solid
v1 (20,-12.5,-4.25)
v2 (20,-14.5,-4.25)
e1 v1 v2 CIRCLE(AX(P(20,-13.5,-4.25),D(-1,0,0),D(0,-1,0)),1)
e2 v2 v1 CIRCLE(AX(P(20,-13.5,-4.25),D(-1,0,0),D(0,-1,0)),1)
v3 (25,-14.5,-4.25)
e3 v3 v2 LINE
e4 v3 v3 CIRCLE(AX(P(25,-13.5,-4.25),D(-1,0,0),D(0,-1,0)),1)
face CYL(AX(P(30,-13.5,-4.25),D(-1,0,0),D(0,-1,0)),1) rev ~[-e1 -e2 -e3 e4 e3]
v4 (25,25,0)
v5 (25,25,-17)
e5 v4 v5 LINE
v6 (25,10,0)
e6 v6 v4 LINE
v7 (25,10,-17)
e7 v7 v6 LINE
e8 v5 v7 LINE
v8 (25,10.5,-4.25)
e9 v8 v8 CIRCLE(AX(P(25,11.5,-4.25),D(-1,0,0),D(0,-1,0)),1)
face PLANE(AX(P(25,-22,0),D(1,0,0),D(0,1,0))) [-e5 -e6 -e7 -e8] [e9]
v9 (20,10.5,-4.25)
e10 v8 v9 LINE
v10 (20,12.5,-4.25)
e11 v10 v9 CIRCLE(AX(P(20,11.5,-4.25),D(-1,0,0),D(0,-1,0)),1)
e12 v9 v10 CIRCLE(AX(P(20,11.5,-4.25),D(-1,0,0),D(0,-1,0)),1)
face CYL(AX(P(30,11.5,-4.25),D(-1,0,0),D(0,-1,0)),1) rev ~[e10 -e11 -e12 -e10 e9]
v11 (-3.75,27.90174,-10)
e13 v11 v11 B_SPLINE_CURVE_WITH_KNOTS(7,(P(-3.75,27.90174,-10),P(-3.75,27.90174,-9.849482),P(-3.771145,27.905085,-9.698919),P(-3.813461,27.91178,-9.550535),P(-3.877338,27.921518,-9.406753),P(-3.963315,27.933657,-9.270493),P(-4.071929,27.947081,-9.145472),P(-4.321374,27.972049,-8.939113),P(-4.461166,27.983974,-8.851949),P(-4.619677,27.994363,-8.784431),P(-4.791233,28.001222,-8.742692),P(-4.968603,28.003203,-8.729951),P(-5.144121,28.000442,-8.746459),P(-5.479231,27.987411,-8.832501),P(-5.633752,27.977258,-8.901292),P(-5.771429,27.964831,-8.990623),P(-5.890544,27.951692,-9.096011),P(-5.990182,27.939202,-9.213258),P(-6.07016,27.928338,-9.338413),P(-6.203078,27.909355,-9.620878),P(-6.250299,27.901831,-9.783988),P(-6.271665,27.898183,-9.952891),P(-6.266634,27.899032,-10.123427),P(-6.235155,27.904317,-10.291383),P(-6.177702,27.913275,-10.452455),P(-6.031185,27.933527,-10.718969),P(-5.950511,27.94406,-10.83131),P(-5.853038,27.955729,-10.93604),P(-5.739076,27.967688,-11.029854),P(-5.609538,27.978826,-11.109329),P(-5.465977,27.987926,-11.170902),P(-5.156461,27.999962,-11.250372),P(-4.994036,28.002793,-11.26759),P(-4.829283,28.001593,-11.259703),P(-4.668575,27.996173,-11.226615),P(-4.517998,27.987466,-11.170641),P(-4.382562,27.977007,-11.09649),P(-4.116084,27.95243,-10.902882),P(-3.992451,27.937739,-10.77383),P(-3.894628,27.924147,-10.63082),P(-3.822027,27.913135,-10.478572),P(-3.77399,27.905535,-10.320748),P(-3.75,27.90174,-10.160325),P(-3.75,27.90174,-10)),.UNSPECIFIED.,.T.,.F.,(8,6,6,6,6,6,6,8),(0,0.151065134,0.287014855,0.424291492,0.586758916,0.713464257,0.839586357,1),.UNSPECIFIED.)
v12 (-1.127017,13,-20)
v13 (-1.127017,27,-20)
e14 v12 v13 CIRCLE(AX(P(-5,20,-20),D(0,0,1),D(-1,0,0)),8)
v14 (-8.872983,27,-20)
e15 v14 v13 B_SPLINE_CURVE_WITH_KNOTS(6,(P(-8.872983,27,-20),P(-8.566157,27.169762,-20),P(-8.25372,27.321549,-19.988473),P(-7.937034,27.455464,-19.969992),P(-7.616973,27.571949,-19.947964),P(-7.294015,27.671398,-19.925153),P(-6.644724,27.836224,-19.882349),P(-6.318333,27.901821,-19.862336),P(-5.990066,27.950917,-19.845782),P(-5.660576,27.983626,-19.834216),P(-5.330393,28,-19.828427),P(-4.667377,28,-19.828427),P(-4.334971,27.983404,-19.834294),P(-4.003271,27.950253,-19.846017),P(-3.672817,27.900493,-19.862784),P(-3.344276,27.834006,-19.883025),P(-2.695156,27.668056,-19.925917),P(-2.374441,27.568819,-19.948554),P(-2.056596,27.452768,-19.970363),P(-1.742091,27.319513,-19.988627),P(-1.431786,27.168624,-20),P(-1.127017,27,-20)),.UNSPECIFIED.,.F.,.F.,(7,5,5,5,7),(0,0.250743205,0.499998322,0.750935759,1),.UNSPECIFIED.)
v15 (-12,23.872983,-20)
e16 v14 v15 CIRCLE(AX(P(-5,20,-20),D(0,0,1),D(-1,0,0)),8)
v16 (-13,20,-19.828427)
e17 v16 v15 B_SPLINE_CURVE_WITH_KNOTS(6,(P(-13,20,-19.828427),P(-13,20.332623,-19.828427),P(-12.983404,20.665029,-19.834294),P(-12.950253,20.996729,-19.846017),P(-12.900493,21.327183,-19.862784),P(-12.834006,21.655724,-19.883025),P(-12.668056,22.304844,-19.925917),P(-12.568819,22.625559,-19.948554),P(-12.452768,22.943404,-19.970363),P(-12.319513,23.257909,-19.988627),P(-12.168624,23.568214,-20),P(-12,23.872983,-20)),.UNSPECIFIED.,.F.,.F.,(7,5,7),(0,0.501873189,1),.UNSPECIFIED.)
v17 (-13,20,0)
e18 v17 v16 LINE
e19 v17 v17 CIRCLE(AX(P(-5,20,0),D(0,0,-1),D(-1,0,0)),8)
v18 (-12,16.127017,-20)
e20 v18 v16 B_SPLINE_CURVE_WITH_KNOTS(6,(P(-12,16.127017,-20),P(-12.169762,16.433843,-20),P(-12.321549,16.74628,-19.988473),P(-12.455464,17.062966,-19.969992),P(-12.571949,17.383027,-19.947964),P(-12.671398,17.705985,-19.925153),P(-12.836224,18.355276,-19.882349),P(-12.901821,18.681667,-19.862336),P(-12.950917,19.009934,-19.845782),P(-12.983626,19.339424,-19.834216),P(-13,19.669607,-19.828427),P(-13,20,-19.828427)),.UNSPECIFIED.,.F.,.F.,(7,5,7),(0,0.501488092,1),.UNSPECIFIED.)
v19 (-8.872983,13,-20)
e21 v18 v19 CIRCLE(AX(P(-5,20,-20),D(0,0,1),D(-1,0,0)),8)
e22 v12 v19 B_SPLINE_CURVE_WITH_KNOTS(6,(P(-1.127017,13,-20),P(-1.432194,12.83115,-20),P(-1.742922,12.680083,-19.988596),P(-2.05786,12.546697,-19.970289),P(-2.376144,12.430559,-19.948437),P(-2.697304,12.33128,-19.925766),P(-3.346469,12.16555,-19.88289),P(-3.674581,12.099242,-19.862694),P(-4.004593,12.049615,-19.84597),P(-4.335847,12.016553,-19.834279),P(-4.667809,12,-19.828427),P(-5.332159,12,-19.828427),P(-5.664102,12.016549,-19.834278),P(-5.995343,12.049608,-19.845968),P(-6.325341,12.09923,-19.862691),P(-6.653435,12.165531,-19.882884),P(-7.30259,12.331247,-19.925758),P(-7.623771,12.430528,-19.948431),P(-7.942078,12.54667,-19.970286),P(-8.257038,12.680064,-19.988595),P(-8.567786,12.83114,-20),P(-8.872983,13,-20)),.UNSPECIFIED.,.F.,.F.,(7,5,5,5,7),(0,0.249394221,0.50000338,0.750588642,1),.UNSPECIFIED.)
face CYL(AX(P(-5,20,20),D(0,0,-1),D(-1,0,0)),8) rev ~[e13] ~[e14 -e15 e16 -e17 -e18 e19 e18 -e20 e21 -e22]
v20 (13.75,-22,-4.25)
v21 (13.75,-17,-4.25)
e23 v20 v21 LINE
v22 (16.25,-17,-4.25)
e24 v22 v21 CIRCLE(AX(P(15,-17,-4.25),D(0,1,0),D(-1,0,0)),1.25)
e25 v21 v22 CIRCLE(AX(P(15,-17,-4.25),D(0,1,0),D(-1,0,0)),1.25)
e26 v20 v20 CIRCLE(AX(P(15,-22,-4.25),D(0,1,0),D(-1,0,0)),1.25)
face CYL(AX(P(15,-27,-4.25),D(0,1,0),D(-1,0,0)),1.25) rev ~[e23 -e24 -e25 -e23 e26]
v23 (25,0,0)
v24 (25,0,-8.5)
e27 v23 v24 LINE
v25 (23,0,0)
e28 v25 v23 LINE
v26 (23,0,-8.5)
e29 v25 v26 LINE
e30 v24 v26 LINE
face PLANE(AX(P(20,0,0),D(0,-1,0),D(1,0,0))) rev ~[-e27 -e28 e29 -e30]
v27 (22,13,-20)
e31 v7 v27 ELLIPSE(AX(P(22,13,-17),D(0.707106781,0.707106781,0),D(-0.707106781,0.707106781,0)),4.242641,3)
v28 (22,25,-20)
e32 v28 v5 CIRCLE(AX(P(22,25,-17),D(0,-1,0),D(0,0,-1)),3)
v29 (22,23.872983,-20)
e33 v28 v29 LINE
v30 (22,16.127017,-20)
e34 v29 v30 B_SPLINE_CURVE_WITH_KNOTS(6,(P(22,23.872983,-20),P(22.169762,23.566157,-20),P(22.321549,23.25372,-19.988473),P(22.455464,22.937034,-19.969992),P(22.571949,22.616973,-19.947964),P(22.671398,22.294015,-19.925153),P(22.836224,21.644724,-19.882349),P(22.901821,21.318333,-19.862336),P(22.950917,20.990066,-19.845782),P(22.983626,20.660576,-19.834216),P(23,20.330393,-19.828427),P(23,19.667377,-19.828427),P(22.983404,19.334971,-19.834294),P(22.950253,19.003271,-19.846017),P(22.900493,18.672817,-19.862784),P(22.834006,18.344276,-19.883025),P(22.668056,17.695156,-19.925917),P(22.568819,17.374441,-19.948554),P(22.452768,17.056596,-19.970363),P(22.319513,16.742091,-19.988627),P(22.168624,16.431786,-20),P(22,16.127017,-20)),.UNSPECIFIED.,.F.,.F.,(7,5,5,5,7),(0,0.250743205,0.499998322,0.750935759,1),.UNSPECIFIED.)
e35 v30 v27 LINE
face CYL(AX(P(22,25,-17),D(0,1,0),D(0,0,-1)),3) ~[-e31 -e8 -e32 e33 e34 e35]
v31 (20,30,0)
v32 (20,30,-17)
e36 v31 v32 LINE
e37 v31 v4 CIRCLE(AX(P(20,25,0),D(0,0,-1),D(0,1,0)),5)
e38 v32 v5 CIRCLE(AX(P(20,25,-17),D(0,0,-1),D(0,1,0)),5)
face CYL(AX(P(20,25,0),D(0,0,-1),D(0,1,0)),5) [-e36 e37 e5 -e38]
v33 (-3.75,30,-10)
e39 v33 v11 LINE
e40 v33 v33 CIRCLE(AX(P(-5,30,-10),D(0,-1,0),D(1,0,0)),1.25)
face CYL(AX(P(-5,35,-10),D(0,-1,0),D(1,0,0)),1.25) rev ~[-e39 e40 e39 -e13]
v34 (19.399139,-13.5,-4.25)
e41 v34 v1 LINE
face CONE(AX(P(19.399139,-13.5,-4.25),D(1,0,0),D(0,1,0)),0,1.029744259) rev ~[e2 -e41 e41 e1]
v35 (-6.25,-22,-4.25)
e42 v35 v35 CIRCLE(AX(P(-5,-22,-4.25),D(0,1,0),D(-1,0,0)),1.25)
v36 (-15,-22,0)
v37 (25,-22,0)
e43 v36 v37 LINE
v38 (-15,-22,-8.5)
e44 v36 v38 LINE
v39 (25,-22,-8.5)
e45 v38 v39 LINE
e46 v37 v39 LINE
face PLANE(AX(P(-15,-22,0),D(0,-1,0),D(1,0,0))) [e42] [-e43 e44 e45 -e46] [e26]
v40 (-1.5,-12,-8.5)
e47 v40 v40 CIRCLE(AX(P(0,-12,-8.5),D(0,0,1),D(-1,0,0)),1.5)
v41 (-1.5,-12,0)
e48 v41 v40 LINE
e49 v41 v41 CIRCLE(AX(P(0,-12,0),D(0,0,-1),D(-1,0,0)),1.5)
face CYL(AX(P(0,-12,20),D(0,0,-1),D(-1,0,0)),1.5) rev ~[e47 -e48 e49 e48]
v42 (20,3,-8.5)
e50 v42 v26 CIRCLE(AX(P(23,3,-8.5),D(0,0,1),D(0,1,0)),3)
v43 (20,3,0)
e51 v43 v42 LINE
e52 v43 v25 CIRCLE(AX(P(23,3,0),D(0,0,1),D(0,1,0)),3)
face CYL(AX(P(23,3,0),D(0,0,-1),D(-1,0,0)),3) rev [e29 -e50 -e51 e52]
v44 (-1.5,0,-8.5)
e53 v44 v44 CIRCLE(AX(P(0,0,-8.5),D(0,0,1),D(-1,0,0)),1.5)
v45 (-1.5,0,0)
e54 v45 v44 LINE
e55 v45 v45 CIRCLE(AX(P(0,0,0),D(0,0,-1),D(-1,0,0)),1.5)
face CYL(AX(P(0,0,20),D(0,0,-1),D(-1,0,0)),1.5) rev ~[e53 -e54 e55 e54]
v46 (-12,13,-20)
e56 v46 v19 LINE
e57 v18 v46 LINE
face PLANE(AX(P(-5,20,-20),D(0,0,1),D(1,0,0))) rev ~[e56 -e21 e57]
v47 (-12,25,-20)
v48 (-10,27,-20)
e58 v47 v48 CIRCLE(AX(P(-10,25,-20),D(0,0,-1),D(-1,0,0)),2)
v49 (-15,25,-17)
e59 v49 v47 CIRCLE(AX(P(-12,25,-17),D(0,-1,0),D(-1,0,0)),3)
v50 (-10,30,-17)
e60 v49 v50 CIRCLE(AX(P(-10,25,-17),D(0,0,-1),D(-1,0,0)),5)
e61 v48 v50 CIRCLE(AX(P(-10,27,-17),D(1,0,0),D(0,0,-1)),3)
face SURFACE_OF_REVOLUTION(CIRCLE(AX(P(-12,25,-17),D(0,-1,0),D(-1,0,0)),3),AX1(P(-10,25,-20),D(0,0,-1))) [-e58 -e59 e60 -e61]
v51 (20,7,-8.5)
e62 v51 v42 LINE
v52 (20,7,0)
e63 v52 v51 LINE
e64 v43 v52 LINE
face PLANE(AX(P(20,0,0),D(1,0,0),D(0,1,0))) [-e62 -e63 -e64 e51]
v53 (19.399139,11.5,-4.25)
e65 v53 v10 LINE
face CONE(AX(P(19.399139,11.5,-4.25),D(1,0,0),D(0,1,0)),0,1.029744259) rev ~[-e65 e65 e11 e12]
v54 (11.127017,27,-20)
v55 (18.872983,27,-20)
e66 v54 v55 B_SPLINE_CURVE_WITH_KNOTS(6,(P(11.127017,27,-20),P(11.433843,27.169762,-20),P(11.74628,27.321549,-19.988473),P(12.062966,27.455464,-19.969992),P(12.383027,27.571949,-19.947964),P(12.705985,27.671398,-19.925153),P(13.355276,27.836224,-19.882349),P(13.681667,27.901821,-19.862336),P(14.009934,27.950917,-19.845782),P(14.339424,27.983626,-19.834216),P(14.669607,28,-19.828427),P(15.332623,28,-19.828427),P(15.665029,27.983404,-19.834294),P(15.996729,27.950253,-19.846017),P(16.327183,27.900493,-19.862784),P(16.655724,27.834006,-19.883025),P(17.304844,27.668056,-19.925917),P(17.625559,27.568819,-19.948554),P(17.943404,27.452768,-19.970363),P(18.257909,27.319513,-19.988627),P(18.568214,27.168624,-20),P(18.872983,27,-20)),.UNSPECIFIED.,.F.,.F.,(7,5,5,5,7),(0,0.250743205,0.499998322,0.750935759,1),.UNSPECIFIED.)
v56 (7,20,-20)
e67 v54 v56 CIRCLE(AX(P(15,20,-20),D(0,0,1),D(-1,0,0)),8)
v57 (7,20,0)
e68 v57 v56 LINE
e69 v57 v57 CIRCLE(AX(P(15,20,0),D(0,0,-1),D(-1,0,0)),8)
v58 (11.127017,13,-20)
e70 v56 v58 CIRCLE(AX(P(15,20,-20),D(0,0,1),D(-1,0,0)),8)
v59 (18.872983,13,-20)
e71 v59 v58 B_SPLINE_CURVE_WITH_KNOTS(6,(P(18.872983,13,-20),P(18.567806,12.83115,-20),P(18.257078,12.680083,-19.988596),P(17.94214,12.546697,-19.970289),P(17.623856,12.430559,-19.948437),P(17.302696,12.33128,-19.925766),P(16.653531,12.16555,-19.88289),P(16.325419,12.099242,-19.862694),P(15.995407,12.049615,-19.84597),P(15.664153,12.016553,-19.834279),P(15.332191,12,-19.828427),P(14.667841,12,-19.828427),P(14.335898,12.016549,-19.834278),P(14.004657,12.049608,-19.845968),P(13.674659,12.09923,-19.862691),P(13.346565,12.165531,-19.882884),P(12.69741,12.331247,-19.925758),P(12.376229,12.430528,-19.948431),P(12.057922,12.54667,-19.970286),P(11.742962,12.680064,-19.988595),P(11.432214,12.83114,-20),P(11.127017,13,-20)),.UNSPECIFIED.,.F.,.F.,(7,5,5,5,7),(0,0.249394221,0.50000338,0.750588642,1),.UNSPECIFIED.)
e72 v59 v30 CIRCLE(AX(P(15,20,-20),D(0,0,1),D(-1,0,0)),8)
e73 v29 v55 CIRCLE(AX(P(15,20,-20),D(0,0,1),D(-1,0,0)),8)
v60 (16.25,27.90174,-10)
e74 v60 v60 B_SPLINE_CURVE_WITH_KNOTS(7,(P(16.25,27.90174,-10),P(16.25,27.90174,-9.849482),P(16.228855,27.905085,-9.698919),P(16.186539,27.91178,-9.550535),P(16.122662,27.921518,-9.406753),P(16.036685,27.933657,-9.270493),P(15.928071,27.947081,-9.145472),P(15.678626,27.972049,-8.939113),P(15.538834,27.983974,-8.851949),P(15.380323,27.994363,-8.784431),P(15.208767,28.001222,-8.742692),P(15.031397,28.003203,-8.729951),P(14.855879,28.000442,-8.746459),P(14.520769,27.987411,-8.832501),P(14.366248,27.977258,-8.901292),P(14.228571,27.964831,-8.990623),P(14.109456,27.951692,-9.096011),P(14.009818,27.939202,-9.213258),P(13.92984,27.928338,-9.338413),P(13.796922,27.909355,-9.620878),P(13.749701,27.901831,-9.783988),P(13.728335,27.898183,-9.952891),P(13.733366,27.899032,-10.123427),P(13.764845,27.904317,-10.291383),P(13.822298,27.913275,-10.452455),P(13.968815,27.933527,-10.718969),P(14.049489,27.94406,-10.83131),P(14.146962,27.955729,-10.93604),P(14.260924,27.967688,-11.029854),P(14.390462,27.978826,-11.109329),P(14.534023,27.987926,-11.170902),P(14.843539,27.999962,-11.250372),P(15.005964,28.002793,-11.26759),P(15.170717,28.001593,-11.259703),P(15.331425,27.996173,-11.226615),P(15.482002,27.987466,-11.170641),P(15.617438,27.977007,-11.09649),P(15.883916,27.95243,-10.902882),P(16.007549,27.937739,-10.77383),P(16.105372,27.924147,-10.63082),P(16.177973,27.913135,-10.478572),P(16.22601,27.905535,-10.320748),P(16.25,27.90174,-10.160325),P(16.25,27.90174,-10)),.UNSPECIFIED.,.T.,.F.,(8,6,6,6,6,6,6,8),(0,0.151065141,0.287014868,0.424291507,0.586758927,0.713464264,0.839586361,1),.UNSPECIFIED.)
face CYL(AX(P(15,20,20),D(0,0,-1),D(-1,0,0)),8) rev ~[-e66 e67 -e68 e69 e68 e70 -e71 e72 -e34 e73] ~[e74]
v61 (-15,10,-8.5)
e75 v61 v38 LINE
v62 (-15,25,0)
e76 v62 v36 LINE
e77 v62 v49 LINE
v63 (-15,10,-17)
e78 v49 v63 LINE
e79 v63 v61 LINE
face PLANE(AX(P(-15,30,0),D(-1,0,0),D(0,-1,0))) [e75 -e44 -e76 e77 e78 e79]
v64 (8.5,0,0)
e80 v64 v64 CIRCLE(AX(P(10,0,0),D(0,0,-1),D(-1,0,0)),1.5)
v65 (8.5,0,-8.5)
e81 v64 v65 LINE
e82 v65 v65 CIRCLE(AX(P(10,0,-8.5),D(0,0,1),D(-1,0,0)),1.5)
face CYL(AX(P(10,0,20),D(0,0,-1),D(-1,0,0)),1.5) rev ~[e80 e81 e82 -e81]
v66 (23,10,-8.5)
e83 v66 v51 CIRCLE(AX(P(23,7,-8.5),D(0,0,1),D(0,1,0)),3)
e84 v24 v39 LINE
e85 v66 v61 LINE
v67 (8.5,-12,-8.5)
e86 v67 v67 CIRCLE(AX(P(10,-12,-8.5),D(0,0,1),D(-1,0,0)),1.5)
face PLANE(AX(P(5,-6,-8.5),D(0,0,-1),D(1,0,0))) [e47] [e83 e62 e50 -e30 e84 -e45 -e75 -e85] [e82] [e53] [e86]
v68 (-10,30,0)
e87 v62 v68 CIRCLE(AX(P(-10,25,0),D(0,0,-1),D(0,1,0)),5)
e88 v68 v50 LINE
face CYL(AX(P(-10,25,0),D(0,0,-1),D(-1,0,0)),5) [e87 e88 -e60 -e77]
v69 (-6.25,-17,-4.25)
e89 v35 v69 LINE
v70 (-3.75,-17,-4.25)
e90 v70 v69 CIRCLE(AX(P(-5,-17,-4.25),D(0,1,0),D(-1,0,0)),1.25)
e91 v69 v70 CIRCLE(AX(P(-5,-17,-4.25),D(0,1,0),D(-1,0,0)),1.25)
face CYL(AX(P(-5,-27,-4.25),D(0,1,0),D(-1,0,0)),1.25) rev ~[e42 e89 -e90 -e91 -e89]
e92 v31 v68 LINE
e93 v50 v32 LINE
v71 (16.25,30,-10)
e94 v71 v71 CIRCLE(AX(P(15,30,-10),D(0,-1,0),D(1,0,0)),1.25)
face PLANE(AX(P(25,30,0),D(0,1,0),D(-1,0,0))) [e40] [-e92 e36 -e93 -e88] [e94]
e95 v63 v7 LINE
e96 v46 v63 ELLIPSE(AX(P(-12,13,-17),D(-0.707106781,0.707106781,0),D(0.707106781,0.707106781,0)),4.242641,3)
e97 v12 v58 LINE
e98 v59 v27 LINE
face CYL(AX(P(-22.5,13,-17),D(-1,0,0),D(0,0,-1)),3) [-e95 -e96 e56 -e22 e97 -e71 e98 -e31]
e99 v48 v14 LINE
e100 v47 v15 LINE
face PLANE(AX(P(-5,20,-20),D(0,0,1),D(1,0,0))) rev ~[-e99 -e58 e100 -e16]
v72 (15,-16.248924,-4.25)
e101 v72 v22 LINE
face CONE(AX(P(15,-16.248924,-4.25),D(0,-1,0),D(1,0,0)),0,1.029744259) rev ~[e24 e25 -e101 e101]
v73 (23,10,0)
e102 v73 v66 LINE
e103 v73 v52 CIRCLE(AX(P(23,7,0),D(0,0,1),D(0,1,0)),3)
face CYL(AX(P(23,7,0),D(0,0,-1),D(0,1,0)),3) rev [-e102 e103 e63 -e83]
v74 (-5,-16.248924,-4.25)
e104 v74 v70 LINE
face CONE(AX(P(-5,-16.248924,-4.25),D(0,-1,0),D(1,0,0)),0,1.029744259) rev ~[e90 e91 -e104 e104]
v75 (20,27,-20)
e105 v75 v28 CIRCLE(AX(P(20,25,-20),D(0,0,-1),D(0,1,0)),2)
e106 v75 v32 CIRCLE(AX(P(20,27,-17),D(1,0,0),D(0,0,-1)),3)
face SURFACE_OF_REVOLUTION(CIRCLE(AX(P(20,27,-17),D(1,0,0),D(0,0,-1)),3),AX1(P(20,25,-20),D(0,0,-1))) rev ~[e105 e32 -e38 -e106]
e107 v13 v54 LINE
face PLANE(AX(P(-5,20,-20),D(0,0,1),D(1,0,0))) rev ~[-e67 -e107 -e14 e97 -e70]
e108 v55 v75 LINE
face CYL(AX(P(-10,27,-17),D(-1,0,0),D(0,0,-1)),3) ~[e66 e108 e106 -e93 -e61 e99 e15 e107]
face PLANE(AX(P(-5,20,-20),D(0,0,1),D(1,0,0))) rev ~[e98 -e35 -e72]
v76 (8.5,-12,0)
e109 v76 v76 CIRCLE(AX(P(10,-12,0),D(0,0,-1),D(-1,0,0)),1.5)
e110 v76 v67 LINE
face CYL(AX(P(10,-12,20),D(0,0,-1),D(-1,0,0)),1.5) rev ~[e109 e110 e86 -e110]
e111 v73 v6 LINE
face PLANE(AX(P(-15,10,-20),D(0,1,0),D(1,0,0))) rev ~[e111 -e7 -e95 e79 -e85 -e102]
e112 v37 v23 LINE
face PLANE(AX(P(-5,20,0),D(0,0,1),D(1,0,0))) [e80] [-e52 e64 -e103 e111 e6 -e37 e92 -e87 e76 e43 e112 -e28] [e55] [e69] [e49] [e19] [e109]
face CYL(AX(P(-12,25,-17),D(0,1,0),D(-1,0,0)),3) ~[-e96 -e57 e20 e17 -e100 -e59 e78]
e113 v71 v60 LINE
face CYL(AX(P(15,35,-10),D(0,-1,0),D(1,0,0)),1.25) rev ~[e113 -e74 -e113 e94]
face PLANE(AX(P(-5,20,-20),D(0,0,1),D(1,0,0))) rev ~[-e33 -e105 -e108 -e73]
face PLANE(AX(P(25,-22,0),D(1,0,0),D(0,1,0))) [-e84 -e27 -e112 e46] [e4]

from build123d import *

# Parameters (mm, degrees)
F0_W          = 20
F0_H          = 20
F1_DEPTH      = 20
F2_D          = 3
F2_DEPTH      = 20
F2_TIP        = 0.9012909285
F3_D          = 16
F3_DEPTH      = 20
F3_TIP        = 4.8068849522
F4_W          = 40
F4_H          = 32
F4_R          = 1.5
F5_DEPTH      = 11.5
F7_D          = 2.5
F7_DEPTH      = 5
F7_TIP        = 0.7510757738
F8_R          = 5
F10_D         = 2.5
F10_DEPTH     = 5
F10_TIP       = 0.7510757738
F11_T1_DEPTH  = 22.5
F11_T3_DEPTH  = 55
F11_T5_DEPTH  = 30
F11_T8_ANGLE  = 90
F11_T10_ANGLE = 90
F13_W         = 5
F13_H         = 10
F14_DEPTH     = 25
F15_R         = 3
F16_D         = 2
F16_DEPTH     = 5
F16_TIP       = 0.600860619


# Not quite as in the source:
# - a fillet or chamfer that OpenCascade refuses, or shapes differently, is made with other operations: its cross-section is extruded or revolved along the edge and cut away or added


with BuildPart() as f1:
    # F0 (on Top) → F1 (new body)
    with BuildSketch(Plane.XY):
        with Locations((-5, 20)):
            Rectangle(F0_W, F0_H)
        with Locations((15, 20)):
            Rectangle(F0_W, F0_H)
        Polygon((5, 10), (-15, 10), (-15, -22), (25, -22), (25, 10), align=None)
    extrude(amount=-F1_DEPTH)

    # F2
    with Locations(Plane.XY):
        with Locations((10, 0), (0, 0), (0, -12), (10, -12)):
            Hole(F2_D / 2, depth=F2_DEPTH)
            with Locations((0, 0, -(F2_DEPTH + F2_TIP / 2))):  # 118° drill point
                Cone(0, F2_D / 2, F2_TIP, mode=Mode.SUBTRACT)

    # F3
    with Locations(Plane.XY):
        with Locations((15, 20), (-5, 20)):
            Hole(F3_D / 2, depth=F3_DEPTH)
            with Locations((0, 0, -(F3_DEPTH + F3_TIP / 2))):  # 118° drill point
                Cone(0, F3_D / 2, F3_TIP, mode=Mode.SUBTRACT)

    # F4 (on face) → F5 (cut)
    with BuildSketch(Plane(origin=(0, 0, -20), x_dir=(1, 0, 0), z_dir=(0, 0, -1))):
        with Locations((5, 6)):
            Rectangle(F4_W, F4_H)
        Circle(F4_R, mode=Mode.SUBTRACT)
        with Locations((0, 12)):
            Circle(F4_R, mode=Mode.SUBTRACT)
        with Locations((10, 0)):
            Circle(F4_R, mode=Mode.SUBTRACT)
        with Locations((10, 12)):
            Circle(F4_R, mode=Mode.SUBTRACT)
    extrude(amount=-F5_DEPTH, mode=Mode.SUBTRACT)

    # F7
    with Locations(Plane.XZ.offset(22)):
        with Locations((-5, -4.25), (15, -4.25)):
            Hole(F7_D / 2, depth=F7_DEPTH)
            with Locations((0, 0, -(F7_DEPTH + F7_TIP / 2))):  # 118° drill point
                Cone(0, F7_D / 2, F7_TIP, mode=Mode.SUBTRACT)

    # F8
    f8_edges = [f1.edges().sort_by_distance(p)[0] for p in [
        (-15, 30, -10),
        (25, 30, -10),
    ]]
    fillet(f8_edges, radius=F8_R)

    # F10
    with Locations(Plane(origin=(0, 30, 0), x_dir=(-1, 0, 0), z_dir=(0, 1, 0))):
        with Locations((5, -10), (-15, -10)):
            Hole(F10_D / 2, depth=F10_DEPTH)
            with Locations((0, 0, -(F10_DEPTH + F10_TIP / 2))):  # 118° drill point
                Cone(0, F10_D / 2, F10_TIP, mode=Mode.SUBTRACT)

    # F11: fillet of radius 3 on 2 edges, made by hand

    # F11_s2 → F11_t1 (cut)
    with BuildSketch(Plane.XZ.offset(-25)):
        with BuildLine():
            ThreePointArc((-15, -17), (-14.1213203436, -19.1213203436), (-12, -20))
            Line((-12, -20), (-15, -20))
            Line((-15, -20), (-15, -17))
        make_face()
        with BuildLine():
            ThreePointArc((22, -20), (24.1213203436, -19.1213203436), (25, -17))
            Line((25, -17), (25, -20))
            Line((25, -20), (22, -20))
        make_face()
    extrude(amount=F11_T1_DEPTH, mode=Mode.SUBTRACT)

    # F11_s4 → F11_t3 (cut)
    with BuildSketch(Plane.YZ.offset(-22.5)):
        with BuildLine():
            ThreePointArc((13, -20), (10.8786796564, -19.1213203436), (10, -17))
            Line((10, -17), (10, -20))
            Line((10, -20), (13, -20))
        make_face()
    extrude(amount=F11_T3_DEPTH, mode=Mode.SUBTRACT)

    # F11_s6 → F11_t5 (cut)
    with BuildSketch(Plane.YZ.offset(-10)):
        with BuildLine():
            ThreePointArc((27, -20), (29.1213203436, -19.1213203436), (30, -17))
            Line((30, -17), (30, -20))
            Line((30, -20), (27, -20))
        make_face()
    extrude(amount=F11_T5_DEPTH, mode=Mode.SUBTRACT)

    # F11_s7 → F11_t8 (revolve, cut)
    with BuildSketch(Plane.XZ.offset(-25)):
        with BuildLine():
            ThreePointArc((-15, -17), (-14.1213203436, -19.1213203436), (-12, -20))
            Line((-12, -20), (-15, -20))
            Line((-15, -20), (-15, -17))
        make_face()
    revolve(axis=Axis((-10, 25, -20), (0, 0, -1)), revolution_arc=F11_T8_ANGLE, mode=Mode.SUBTRACT)

    # F11_s9 → F11_t10 (revolve, cut)
    with BuildSketch(Plane.YZ.offset(20)):
        with BuildLine():
            ThreePointArc((27, -20), (29.1213203436, -19.1213203436), (30, -17))
            Line((30, -17), (30, -20))
            Line((30, -20), (27, -20))
        make_face()
    revolve(axis=Axis((20, 25, -20), (0, 0, -1)), revolution_arc=F11_T10_ANGLE, mode=Mode.SUBTRACT)

    # F13 (on face) → F14 (cut)
    with BuildSketch(Plane.XY):
        with Locations((22.5, 5)):
            Rectangle(F13_W, F13_H)
    extrude(amount=-F14_DEPTH, mode=Mode.SUBTRACT)

    # F15
    f15_edges = [f1.edges().sort_by_distance(p)[0] for p in [
        (20, 10, -4.25),
        (20, 0, -4.25),
    ]]
    fillet(f15_edges, radius=F15_R)

    # F16
    with Locations(Plane.YZ.offset(25)):
        with Locations((-13.5, -4.25), (11.5, -4.25)):
            Hole(F16_D / 2, depth=F16_DEPTH)
            with Locations((0, 0, -(F16_DEPTH + F16_TIP / 2))):  # 118° drill point
                Cone(0, F16_D / 2, F16_TIP, mode=Mode.SUBTRACT)


solid = f1.part
